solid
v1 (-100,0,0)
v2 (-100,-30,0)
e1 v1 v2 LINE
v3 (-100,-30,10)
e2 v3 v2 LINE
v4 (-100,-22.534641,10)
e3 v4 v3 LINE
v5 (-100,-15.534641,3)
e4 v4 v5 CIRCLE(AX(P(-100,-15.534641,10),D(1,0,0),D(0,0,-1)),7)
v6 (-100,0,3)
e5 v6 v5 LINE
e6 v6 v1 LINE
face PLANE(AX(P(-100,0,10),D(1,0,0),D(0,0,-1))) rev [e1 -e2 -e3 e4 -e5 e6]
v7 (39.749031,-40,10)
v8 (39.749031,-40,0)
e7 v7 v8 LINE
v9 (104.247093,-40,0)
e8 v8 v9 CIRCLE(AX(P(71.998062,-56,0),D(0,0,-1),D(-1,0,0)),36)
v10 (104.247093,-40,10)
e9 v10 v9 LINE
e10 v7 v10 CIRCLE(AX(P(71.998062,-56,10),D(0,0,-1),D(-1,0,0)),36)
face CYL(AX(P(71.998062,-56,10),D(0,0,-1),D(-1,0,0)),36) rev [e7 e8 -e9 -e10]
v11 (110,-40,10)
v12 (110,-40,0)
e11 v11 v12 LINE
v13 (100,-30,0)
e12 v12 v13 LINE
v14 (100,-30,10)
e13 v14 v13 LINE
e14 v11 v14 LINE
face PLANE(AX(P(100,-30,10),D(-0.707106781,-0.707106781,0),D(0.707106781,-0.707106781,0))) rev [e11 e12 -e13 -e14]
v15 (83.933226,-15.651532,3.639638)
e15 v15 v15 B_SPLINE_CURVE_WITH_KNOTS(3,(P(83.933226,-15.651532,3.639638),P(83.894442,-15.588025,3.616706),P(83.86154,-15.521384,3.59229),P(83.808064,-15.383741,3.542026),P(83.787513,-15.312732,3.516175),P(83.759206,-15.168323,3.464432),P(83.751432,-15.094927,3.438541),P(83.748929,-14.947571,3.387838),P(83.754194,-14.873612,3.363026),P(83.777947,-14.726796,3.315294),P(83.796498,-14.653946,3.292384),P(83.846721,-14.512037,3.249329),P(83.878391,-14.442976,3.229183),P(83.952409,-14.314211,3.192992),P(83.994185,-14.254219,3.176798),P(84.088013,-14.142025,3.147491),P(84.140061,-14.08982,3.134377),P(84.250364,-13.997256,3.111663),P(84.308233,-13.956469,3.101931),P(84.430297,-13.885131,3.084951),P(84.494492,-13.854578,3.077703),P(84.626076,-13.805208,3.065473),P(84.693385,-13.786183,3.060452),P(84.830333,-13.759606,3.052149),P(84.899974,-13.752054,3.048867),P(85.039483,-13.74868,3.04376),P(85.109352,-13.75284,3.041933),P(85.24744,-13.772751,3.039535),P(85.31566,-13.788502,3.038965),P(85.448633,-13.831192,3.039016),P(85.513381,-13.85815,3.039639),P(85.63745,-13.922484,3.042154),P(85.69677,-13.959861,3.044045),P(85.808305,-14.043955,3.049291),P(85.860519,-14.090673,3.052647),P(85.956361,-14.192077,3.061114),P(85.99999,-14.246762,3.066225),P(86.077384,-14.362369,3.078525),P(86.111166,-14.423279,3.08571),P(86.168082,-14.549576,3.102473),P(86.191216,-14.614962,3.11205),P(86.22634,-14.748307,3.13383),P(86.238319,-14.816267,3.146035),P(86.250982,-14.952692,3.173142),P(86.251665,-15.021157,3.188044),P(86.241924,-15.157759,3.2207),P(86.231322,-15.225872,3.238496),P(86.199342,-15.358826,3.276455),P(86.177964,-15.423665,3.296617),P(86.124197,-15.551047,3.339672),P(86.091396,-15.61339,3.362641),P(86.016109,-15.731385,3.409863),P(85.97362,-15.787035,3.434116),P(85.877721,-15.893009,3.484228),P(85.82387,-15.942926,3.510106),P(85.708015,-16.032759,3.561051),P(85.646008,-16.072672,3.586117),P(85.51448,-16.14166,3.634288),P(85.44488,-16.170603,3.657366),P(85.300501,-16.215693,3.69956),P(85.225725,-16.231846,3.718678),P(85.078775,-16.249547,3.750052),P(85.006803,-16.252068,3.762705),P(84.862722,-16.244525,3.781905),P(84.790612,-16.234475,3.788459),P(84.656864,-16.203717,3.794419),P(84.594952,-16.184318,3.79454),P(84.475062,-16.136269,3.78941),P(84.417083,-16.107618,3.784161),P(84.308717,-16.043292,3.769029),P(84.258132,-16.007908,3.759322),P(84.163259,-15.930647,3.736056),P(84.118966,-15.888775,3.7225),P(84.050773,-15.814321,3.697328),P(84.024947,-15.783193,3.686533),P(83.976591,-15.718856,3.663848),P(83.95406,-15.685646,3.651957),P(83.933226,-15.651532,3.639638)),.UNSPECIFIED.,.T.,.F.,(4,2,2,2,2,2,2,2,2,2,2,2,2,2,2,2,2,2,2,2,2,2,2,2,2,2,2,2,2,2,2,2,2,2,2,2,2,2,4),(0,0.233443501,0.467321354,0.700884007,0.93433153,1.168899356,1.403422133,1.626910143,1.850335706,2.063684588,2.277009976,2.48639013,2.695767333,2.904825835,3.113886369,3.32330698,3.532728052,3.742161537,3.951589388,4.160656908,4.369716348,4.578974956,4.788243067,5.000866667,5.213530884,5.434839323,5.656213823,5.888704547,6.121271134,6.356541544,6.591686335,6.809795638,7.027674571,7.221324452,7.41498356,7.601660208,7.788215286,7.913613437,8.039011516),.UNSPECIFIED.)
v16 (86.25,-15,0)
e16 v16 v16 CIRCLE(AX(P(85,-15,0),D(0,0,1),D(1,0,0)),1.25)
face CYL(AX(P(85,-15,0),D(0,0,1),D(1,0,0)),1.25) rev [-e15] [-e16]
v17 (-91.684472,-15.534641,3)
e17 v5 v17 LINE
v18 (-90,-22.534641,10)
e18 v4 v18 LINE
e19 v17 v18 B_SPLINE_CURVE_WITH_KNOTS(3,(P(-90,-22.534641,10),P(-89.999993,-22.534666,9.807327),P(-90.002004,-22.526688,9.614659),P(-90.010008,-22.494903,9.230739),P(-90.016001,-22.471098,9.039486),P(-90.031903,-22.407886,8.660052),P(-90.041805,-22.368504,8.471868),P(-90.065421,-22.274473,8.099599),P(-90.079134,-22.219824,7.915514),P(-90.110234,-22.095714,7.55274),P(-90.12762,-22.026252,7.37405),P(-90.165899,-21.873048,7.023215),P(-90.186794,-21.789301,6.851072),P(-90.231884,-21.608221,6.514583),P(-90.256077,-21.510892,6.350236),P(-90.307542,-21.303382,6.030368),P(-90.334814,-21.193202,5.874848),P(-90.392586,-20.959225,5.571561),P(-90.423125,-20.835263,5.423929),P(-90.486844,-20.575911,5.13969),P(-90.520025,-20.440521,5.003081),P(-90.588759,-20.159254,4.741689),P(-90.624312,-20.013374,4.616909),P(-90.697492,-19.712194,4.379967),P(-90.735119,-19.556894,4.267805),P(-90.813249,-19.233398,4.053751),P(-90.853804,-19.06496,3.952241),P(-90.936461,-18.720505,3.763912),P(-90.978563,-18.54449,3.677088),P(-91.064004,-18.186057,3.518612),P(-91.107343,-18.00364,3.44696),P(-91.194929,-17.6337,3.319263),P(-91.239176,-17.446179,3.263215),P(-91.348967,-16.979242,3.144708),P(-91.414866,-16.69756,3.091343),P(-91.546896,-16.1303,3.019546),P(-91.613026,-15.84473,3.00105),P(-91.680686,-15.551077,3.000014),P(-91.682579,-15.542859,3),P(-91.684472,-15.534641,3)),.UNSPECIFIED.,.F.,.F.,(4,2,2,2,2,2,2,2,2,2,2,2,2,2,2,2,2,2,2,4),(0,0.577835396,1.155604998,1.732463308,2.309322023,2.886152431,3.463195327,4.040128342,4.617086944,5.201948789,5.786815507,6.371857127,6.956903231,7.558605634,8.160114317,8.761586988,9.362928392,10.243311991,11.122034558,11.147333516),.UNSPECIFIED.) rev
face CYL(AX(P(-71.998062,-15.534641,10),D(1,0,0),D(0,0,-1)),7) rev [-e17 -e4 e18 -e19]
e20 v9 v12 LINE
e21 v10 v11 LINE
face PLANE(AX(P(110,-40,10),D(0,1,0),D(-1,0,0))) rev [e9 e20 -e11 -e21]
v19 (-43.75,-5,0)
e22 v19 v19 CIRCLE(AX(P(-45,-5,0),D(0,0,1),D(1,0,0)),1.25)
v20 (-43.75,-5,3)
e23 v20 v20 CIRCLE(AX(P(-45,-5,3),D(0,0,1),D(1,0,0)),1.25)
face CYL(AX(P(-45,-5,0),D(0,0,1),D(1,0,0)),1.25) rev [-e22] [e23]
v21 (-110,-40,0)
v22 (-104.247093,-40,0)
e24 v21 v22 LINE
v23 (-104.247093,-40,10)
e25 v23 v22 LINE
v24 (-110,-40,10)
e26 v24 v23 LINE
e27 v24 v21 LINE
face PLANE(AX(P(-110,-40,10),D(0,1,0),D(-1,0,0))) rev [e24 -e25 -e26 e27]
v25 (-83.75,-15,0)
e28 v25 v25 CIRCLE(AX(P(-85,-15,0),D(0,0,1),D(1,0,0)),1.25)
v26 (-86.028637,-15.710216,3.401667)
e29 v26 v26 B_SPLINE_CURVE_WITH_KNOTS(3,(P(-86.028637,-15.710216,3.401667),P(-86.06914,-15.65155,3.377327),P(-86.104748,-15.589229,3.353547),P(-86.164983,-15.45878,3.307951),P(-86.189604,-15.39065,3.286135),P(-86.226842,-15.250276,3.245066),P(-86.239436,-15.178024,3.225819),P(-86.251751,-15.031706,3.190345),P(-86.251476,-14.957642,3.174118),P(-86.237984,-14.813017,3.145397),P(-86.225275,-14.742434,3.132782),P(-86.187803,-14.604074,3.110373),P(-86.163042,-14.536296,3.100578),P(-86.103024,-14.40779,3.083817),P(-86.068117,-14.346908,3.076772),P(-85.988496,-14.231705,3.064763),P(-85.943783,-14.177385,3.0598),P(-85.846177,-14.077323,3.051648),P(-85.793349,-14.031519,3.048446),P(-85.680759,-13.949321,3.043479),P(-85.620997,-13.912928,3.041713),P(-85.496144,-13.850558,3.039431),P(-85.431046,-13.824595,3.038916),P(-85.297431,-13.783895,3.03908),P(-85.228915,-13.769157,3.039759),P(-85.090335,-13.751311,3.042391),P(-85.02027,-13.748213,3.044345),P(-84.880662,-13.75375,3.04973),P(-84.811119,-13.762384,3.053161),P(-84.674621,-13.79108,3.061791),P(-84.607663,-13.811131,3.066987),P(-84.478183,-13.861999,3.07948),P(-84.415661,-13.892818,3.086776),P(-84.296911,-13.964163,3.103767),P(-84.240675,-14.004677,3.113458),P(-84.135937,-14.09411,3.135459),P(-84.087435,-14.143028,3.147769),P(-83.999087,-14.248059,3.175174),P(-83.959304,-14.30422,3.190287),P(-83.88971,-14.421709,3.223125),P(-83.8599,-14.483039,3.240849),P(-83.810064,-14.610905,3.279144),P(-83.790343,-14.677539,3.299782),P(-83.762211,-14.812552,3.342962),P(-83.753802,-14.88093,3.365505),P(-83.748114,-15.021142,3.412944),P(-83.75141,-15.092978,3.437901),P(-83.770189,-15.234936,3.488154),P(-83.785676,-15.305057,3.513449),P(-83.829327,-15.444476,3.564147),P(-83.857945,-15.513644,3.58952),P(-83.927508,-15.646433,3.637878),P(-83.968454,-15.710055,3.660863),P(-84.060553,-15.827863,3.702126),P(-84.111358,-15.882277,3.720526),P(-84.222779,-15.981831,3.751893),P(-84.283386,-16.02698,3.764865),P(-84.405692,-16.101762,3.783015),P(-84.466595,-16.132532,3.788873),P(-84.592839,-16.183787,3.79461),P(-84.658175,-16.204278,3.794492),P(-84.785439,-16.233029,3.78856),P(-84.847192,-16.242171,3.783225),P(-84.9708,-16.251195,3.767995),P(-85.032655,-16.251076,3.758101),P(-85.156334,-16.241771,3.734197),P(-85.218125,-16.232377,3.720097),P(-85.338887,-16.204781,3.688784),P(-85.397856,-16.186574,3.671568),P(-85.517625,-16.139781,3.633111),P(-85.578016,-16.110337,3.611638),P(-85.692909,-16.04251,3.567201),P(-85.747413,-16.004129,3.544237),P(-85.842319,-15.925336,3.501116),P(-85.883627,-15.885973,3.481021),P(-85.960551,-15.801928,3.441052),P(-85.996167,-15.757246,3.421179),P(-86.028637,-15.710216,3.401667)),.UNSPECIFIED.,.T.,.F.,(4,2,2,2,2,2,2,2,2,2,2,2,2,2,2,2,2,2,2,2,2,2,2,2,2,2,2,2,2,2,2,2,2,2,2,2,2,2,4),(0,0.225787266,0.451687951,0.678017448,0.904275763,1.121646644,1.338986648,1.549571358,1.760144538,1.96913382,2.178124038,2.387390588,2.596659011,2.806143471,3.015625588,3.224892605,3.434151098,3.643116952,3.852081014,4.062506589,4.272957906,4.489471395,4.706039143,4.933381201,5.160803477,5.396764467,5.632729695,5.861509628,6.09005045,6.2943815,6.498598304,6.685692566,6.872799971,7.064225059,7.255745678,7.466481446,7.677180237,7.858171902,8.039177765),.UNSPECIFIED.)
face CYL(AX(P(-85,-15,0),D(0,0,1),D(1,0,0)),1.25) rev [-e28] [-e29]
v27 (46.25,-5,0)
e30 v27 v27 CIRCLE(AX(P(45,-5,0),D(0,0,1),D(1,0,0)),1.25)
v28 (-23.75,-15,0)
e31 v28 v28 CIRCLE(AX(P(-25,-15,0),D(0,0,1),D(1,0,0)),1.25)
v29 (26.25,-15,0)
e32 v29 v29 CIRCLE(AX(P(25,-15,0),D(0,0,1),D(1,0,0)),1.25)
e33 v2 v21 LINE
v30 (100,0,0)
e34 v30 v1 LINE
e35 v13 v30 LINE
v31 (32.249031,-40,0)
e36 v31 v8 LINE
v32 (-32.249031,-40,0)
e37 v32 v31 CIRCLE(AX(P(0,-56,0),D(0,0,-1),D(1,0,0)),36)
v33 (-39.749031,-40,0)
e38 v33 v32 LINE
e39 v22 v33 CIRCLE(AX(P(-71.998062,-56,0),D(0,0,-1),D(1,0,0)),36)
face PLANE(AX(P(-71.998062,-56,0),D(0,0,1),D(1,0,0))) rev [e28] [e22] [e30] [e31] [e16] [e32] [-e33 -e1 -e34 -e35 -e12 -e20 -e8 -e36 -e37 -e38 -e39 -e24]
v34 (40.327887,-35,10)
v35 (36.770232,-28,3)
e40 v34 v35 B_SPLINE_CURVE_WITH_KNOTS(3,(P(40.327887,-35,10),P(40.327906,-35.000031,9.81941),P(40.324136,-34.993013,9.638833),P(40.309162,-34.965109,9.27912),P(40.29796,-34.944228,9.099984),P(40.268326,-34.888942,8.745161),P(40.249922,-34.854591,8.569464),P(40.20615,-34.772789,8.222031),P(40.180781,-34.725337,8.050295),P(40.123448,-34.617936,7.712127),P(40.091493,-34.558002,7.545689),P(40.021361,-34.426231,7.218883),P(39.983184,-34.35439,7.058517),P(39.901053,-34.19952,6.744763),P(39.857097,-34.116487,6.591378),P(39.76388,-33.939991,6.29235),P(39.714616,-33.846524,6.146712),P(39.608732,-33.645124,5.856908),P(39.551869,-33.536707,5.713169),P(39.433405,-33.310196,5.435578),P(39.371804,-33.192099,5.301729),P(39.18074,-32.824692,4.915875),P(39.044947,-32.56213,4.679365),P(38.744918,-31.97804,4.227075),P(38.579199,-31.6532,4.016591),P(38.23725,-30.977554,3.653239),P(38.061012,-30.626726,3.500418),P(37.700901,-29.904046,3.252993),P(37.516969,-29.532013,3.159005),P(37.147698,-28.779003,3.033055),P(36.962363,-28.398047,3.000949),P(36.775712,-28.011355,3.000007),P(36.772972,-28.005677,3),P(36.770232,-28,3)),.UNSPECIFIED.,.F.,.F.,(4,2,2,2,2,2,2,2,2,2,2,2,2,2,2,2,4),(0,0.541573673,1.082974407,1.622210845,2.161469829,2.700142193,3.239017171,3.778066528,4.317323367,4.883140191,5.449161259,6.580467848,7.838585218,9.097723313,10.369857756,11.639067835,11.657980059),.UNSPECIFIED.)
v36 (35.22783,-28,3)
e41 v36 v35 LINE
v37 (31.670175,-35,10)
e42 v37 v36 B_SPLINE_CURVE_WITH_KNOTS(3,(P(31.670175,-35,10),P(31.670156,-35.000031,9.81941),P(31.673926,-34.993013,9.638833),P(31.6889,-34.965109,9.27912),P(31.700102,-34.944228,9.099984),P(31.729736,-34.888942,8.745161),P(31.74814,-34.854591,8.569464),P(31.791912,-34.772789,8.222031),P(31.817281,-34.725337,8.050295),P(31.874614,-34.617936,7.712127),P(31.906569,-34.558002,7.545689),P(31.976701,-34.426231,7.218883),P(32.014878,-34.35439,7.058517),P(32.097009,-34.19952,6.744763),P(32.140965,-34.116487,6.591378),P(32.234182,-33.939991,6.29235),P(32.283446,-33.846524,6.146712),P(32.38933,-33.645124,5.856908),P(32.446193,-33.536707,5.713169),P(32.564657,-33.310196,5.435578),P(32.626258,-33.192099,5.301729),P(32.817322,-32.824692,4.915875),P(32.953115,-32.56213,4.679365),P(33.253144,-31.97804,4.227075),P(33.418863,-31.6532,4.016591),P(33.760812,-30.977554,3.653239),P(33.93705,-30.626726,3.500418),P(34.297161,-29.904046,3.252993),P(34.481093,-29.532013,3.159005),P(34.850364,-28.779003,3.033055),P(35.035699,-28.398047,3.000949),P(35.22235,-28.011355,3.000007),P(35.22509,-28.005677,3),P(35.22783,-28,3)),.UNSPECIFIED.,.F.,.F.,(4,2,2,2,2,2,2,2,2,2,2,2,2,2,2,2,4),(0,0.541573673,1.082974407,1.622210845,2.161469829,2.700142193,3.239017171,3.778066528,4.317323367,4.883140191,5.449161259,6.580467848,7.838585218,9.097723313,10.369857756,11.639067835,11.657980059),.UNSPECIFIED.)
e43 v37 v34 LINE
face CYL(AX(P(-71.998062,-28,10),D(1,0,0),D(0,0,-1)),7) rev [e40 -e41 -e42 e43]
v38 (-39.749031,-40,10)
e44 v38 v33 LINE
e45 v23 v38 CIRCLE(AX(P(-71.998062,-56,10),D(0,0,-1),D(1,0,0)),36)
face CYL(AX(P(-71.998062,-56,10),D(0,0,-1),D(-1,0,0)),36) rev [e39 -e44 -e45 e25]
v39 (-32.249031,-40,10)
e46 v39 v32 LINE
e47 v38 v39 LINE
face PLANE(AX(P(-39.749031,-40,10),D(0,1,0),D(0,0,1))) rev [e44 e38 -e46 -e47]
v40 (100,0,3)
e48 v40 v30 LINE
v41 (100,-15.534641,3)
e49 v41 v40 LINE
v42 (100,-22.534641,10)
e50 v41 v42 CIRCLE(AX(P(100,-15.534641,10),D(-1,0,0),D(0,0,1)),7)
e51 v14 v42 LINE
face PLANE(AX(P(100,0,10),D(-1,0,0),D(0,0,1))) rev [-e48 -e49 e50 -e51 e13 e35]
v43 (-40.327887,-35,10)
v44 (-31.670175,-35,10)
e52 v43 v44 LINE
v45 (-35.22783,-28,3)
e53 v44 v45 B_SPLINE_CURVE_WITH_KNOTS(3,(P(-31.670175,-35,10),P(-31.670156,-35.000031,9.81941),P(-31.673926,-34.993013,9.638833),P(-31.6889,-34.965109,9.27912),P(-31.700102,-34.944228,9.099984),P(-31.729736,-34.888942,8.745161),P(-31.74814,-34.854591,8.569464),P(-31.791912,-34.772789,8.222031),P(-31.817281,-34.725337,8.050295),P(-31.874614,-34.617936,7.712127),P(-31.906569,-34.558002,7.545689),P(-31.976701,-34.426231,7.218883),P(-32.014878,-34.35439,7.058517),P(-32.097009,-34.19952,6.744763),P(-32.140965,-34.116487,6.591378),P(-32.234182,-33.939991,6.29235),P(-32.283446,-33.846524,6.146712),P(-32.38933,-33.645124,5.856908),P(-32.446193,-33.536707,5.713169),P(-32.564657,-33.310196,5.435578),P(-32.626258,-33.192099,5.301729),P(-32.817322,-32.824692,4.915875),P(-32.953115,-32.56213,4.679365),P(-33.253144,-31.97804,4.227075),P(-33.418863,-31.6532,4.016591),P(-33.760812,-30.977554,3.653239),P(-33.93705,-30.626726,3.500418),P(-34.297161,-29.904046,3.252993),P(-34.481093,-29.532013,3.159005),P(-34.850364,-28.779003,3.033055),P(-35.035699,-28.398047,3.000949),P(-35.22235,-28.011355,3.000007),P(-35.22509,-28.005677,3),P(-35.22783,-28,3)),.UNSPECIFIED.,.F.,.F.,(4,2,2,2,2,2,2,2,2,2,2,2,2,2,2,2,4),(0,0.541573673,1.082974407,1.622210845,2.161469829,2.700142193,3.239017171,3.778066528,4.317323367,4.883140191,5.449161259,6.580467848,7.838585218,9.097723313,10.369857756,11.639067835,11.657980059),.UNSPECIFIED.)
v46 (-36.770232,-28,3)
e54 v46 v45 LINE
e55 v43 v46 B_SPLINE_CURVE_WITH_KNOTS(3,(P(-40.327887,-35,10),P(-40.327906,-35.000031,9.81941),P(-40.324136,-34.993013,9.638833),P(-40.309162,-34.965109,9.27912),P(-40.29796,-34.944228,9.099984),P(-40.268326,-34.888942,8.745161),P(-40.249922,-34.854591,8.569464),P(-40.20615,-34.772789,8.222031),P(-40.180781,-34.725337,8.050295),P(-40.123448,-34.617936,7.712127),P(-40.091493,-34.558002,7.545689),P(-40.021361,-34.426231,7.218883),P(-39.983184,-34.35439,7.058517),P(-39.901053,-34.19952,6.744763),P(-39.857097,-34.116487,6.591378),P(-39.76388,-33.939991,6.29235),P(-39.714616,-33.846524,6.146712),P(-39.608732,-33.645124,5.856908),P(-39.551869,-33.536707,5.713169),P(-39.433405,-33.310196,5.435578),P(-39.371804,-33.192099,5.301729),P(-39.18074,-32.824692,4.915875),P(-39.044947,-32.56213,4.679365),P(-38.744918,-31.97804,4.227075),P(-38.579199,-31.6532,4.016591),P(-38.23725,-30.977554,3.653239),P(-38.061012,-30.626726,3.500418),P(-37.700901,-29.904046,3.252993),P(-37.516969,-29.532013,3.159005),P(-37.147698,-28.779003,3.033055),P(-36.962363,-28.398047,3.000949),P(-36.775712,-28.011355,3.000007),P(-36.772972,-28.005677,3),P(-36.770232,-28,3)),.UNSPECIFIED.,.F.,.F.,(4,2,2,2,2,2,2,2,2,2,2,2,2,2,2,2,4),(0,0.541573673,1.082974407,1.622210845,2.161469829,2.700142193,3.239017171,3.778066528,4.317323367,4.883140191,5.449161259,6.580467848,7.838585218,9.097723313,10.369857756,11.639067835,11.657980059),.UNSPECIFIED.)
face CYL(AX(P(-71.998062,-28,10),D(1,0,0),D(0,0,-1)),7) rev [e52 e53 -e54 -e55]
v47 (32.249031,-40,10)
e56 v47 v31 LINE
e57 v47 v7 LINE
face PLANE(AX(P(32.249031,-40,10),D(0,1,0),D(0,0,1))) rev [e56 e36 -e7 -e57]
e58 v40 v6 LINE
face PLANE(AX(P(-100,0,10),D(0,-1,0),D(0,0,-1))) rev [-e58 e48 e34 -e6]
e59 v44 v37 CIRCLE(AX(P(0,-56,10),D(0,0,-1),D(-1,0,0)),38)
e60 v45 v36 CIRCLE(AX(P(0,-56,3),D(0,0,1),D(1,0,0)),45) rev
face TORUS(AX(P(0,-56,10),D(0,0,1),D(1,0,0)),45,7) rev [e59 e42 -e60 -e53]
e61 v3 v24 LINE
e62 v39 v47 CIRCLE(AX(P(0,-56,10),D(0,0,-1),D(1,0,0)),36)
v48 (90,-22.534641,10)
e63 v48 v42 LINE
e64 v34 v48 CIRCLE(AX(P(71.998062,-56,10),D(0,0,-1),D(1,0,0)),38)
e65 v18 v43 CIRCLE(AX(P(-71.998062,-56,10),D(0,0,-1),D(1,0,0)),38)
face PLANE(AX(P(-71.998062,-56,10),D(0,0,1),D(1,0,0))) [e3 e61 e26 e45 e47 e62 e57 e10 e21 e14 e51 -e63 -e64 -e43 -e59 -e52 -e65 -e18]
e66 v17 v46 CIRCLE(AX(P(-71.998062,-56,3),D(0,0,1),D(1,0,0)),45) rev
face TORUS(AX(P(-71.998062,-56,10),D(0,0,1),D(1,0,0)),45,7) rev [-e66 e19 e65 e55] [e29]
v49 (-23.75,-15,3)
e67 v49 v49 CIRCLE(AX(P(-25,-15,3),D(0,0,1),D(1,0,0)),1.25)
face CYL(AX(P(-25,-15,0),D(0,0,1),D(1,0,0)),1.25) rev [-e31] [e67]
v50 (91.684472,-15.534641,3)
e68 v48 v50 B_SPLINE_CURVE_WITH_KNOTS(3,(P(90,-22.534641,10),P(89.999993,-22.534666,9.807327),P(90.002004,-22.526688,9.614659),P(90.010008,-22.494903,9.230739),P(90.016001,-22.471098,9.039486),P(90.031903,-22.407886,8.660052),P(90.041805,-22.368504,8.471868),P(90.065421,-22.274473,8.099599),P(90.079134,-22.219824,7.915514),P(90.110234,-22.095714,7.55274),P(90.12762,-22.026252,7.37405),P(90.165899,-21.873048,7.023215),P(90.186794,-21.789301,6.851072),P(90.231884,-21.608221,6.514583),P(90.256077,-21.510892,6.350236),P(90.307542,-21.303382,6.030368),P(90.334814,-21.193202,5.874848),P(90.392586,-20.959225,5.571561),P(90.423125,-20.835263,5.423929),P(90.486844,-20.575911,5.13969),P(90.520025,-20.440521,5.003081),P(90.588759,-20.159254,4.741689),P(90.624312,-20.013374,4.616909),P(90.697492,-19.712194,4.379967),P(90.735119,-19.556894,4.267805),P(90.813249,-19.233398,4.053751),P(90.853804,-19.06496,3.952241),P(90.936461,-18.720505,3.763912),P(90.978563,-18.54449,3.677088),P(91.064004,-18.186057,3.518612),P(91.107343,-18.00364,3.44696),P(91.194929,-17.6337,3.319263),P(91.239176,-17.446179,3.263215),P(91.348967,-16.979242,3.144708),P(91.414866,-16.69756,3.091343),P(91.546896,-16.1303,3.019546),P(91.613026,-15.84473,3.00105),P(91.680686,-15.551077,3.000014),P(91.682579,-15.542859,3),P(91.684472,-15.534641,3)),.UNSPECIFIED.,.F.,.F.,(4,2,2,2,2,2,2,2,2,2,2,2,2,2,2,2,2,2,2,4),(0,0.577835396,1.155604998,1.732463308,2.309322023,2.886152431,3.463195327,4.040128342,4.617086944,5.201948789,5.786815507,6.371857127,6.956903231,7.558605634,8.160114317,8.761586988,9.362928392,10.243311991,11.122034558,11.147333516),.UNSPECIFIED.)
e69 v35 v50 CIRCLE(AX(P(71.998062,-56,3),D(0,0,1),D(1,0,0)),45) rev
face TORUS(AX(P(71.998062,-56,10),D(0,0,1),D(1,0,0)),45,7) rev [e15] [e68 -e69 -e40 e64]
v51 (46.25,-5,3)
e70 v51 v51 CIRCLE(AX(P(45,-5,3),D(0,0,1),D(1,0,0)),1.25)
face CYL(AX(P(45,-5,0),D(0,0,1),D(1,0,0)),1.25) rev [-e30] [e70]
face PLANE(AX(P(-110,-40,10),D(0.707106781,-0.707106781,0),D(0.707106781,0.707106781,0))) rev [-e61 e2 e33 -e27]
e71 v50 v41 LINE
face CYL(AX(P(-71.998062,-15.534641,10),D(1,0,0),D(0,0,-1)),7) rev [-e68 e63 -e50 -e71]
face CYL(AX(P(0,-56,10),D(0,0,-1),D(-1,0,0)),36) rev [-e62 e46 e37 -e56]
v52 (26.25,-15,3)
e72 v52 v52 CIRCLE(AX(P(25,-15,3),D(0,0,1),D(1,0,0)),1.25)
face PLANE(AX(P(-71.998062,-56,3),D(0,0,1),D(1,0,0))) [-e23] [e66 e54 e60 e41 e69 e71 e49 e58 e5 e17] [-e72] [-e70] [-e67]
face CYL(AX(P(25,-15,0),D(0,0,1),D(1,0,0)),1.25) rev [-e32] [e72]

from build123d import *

# Parameters (mm, degrees)
MAIN_DEPTH          = 10
BACKCUT_DEPTH       = 7
FILLET1_R           = 7
FIXHOLES_DEPTH      = 118.256129904
FIXHOLES_DEPTH_BACK = 118.256129904
SKETCH3_R           = 1.25


with BuildPart() as part:
    # Sketch1 → Main (new body)
    with BuildSketch(Plane.XY):
        with BuildLine():
            Line((-100, 0), (100, 0))
            Line((100, 0), (100, -30))
            Line((100, -30), (110, -40))
            Line((110, -40), (104.24709298, -40))
            ThreePointArc((104.24709298, -40), (71.998061986, -20), (39.749030993, -40))
            Line((39.749030993, -40), (32.249030993, -40))
            ThreePointArc((32.249030993, -40), (0, -20), (-32.249030993, -40))
            Line((-32.249030993, -40), (-39.749030993, -40))
            ThreePointArc((-39.749030993, -40), (-71.998061986, -20), (-104.24709298, -40))
            Line((-104.24709298, -40), (-110, -40))
            Line((-110, -40), (-100, -30))
            Line((-100, -30), (-100, 0))
        make_face()
    extrude(amount=MAIN_DEPTH)

    # Sketch2 → BackCut (cut)
    with BuildSketch(Plane.XY.offset(10)):
        with BuildLine():
            Line((-100, 0), (100, 0))
            Line((100, 0), (100, -22.534641377))
            Line((100, -22.534641377), (90, -22.534641377))
            ThreePointArc((90, -22.534641377), (62.748658295, -19.142863224), (40.327886742, -35))
            Line((40.327886742, -35), (31.670175244, -35))
            ThreePointArc((31.670175244, -35), (0, -18), (-31.670175244, -35))
            Line((-31.670175244, -35), (-40.327886742, -35))
            ThreePointArc((-40.327886742, -35), (-62.748658295, -19.142863224), (-90, -22.534641377))
            Line((-90, -22.534641377), (-100, -22.534641377))
            Line((-100, -22.534641377), (-100, 0))
        make_face()
    extrude(amount=-BACKCUT_DEPTH, mode=Mode.SUBTRACT)

    # Fillet1
    fillet1_edges = [part.edges().sort_by_distance(p)[0] for p in [
        (-62.748658295, -19.142863224, 3),
        (-95, -22.534641377, 3),
        (0, -18, 3),
        (95, -22.534641377, 3),
        (62.748658295, -19.142863224, 3),
        (-35.999030993, -35, 3),
        (35.999030993, -35, 3),
    ]]
    fillet(fillet1_edges, radius=FILLET1_R - 0.0001)  # a hair under: the kernel refuses the full size

    # Sketch3 → FixHoles (cut, two sides: drawn at the far end of the back side and taken through both)
    with BuildSketch(Plane.XY.offset(3).offset(-FIXHOLES_DEPTH_BACK)):
        with Locations((-45, -5)):
            Circle(SKETCH3_R)
        with Locations((45, -5)):
            Circle(SKETCH3_R)
        with Locations((-25, -15)):
            Circle(SKETCH3_R)
        with Locations((25, -15)):
            Circle(SKETCH3_R)
        with Locations((-85, -15)):
            Circle(SKETCH3_R)
        with Locations((85, -15)):
            Circle(SKETCH3_R)
    extrude(amount=FIXHOLES_DEPTH + FIXHOLES_DEPTH_BACK, mode=Mode.SUBTRACT)


solid = part.part
